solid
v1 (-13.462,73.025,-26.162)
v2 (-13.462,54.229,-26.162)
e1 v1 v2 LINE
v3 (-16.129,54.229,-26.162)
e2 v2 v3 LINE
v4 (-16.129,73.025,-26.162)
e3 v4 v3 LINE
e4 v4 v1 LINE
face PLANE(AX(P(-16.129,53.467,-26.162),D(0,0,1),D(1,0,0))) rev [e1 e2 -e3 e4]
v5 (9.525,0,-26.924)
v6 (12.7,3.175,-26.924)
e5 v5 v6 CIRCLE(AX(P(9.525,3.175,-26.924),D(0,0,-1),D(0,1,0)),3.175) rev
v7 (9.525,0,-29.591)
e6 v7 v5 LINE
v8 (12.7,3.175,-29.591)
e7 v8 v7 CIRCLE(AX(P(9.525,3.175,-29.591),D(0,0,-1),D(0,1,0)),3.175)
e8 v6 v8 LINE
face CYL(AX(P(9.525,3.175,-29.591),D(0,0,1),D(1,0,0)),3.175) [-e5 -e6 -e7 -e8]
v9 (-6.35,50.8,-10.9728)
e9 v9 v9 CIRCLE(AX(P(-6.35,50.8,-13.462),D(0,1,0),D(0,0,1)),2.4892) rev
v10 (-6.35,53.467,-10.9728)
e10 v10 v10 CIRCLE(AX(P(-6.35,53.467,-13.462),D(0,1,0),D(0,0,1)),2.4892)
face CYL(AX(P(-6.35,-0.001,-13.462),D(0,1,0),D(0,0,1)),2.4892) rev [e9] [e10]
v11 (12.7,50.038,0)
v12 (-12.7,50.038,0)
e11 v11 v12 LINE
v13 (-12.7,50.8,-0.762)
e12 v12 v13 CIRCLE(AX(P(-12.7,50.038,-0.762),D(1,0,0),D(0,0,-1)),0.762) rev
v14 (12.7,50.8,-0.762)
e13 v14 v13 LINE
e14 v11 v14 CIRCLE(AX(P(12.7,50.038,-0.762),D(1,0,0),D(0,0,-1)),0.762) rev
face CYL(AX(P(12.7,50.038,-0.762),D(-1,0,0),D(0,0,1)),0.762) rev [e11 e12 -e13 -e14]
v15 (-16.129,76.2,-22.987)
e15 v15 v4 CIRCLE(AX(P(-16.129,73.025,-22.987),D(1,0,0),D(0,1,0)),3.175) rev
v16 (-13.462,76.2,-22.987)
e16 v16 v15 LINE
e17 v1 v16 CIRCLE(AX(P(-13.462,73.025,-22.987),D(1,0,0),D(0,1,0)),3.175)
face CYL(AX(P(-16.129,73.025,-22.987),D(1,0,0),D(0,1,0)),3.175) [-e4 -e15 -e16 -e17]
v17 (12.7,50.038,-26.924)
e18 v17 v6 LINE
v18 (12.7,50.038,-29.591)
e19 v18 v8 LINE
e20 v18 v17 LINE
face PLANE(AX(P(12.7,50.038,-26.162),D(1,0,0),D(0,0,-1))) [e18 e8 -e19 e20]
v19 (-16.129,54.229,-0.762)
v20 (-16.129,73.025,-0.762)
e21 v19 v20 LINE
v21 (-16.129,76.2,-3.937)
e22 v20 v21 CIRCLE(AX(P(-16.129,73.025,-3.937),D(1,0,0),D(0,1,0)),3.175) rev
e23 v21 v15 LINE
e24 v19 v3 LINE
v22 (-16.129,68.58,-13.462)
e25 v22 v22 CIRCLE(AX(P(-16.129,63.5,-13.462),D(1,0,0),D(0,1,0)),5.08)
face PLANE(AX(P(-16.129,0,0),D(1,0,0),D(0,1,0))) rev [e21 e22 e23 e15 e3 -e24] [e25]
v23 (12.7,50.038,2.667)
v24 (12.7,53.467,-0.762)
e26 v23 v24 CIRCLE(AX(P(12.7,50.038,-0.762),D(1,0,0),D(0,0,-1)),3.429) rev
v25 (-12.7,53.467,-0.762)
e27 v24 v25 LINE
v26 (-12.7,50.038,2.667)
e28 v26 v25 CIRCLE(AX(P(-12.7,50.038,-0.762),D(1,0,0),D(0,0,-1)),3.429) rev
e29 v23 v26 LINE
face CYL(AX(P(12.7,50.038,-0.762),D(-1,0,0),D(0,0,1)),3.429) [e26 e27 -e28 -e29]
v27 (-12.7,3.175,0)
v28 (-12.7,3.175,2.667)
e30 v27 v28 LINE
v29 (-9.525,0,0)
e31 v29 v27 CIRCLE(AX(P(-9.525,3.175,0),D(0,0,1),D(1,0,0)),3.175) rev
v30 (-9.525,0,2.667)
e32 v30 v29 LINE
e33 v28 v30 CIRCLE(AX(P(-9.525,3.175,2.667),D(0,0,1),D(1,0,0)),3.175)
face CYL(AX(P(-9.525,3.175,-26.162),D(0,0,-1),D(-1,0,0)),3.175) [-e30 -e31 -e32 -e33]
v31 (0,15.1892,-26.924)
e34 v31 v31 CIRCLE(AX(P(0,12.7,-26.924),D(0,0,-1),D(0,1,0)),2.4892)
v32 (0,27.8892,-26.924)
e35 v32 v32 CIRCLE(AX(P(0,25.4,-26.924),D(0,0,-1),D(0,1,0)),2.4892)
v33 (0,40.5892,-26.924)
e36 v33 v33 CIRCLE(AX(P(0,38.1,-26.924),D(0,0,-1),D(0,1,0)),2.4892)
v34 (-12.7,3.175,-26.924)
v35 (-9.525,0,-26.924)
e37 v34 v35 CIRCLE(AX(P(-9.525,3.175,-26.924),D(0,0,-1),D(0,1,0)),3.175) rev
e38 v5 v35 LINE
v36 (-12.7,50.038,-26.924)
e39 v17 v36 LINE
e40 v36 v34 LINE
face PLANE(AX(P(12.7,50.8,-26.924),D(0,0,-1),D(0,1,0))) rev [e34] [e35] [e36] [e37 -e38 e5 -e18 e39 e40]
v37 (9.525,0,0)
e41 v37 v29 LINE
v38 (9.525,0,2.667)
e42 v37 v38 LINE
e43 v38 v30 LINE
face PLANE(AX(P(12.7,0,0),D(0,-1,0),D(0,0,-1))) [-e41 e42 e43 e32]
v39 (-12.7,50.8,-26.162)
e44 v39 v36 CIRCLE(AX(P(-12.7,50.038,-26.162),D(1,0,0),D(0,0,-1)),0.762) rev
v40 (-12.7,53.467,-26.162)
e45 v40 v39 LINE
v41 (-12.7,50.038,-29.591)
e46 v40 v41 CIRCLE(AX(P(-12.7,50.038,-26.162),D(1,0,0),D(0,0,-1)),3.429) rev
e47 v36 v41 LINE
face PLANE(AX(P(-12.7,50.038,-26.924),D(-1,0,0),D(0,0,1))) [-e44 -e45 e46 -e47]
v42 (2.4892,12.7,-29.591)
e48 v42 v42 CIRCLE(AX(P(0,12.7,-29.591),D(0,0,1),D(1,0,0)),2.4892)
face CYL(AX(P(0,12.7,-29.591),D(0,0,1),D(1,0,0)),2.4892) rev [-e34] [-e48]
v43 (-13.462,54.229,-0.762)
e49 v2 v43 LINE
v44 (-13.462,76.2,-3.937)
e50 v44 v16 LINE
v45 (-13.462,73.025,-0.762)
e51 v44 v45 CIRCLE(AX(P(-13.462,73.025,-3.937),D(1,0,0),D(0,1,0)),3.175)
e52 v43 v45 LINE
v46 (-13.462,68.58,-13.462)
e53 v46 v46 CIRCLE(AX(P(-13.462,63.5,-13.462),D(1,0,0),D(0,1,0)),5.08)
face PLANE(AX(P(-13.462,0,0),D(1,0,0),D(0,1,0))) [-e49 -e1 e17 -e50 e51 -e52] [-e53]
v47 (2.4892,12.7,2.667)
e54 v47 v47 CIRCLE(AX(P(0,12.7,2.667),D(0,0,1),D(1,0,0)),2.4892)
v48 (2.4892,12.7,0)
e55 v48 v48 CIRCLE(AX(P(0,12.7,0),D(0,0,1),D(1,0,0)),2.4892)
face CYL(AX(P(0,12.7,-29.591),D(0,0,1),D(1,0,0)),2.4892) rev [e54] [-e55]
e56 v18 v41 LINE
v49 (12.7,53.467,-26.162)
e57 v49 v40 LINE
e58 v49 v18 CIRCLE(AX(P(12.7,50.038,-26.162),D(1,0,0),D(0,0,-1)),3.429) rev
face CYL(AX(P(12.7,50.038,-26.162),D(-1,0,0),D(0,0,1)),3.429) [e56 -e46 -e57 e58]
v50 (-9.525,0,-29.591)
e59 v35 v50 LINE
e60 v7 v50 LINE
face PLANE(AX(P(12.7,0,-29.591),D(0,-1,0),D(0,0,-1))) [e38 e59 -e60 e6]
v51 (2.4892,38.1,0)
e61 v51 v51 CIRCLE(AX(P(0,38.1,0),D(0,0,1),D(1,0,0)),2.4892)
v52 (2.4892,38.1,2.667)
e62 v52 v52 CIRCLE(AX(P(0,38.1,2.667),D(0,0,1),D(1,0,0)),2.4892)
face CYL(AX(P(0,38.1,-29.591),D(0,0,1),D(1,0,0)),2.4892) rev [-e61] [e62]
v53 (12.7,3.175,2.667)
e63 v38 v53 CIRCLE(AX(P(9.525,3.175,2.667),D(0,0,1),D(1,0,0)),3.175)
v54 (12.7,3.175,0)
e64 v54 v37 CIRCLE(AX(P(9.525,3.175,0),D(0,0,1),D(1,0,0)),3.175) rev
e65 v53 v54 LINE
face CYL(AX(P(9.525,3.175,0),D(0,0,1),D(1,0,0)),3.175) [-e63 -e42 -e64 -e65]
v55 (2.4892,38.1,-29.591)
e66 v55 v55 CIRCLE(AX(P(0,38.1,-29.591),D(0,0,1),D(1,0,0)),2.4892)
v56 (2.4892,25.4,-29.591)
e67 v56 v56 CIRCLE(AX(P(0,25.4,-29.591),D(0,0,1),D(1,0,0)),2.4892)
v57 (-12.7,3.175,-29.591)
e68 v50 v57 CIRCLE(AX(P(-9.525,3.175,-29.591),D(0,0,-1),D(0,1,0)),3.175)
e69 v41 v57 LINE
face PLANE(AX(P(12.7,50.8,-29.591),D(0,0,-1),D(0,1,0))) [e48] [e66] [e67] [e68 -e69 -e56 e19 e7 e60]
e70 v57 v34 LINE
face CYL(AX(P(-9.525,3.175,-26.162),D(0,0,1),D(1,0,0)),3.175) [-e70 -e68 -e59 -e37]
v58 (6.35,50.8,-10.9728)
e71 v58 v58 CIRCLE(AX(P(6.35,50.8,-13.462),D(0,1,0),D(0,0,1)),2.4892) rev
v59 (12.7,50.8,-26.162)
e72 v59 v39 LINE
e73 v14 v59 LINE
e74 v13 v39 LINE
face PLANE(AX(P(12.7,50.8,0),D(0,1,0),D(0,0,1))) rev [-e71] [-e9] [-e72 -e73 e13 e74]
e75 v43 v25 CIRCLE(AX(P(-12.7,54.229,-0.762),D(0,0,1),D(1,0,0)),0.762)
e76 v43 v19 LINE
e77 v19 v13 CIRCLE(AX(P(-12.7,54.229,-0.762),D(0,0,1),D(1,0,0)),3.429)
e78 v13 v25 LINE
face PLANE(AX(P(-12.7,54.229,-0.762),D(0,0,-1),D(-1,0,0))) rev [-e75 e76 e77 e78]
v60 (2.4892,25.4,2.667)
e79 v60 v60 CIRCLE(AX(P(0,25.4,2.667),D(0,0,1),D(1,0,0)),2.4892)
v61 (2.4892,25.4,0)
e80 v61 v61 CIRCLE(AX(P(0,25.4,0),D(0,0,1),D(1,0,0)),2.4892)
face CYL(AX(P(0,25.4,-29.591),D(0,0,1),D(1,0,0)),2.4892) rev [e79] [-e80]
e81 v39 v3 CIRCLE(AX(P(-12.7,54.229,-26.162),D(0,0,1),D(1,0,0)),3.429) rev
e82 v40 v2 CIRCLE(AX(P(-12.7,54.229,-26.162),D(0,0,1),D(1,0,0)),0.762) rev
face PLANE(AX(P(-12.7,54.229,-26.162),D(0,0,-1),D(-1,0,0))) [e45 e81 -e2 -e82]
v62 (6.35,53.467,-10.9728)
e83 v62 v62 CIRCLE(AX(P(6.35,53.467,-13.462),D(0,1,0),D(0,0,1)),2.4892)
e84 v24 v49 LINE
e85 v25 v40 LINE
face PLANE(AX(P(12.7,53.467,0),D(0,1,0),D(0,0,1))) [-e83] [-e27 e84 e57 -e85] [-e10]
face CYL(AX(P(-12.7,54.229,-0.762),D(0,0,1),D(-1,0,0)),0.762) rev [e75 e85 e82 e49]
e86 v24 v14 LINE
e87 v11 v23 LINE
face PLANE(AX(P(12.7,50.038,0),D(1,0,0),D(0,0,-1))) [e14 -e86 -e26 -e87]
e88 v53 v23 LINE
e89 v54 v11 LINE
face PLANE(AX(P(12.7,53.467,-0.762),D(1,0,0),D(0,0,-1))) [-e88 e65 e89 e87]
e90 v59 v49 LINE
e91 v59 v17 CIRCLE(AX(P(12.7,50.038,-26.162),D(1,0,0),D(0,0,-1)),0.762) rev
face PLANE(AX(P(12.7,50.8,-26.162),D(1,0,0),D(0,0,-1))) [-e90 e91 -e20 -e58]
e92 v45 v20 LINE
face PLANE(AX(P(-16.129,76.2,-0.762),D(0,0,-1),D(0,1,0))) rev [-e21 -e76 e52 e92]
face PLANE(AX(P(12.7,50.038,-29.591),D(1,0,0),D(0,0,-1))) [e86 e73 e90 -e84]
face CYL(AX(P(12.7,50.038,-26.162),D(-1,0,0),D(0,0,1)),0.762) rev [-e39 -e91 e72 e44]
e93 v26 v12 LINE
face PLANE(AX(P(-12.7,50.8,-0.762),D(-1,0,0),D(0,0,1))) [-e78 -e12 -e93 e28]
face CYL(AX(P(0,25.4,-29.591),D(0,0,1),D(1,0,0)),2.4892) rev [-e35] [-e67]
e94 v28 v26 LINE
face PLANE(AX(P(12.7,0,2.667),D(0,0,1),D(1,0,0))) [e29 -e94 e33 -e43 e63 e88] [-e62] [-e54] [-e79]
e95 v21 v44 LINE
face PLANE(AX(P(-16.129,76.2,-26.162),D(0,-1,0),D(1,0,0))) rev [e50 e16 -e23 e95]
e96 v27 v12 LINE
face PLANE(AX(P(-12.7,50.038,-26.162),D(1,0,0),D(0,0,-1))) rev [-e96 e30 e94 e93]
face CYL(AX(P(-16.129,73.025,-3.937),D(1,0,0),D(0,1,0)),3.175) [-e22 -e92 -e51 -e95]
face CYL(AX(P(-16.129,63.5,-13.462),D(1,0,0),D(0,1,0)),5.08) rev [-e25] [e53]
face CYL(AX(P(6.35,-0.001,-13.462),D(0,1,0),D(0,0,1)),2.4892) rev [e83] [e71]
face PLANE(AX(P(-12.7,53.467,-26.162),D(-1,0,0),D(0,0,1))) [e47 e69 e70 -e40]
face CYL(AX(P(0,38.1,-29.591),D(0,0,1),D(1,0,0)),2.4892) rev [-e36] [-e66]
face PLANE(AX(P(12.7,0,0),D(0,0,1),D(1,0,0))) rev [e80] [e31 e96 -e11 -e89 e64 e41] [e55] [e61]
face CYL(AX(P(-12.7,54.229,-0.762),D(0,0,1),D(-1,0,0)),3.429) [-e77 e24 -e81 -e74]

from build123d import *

# Parameters (mm, degrees)
BASE_FLANGE1_START = -12.7
BASE_FLANGE1_DEPTH = 25.4
EDGE_FLANGE1_DEPTH = 25.4
SKETCH9_R          = 5.08
CUT_EXTRUDE1_DEPTH = 86.828419099
SKETCH10_R         = 2.4892
CUT_EXTRUDE2_DEPTH = 85.303992818
CUT_EXTRUDE3_REACH = 65.202
SKETCH11_R         = 2.4892
FILLET1_R          = 3.175


# Read off the part's stored shape, not the designer's step: Base-Flange1
# Sheet-metal steps are written as plain solids
with BuildPart() as part:
    # Base-Flange1 outline → Base-Flange1 (new body)
    with BuildSketch(Plane(origin=(0, 0, 0), x_dir=(0, 0, -1), z_dir=(1, 0, 0)).offset(BASE_FLANGE1_START)):
        with BuildLine():
            Line((26.924, 50.038), (26.924, 0))
            Line((26.924, 0), (29.591, 0))
            Line((29.591, 0), (29.591, 50.038))
            ThreePointArc((29.591, 50.038), (28.586669153, 52.462669153), (26.162, 53.467))
            Line((26.162, 53.467), (0.762, 53.467))
            ThreePointArc((0.762, 53.467), (-1.662669153, 52.462669153), (-2.667, 50.038))
            Line((-2.667, 50.038), (-2.667, 0))
            Line((-2.667, 0), (0, 0))
            Line((0, 0), (0, 50.038))
            ThreePointArc((0, 50.038), (0.223184633, 50.576815367), (0.762, 50.8))
            Line((0.762, 50.8), (26.162, 50.8))
            ThreePointArc((26.162, 50.8), (26.700815367, 50.576815367), (26.924, 50.038))
        make_face()
    extrude(amount=BASE_FLANGE1_DEPTH)

    # Edge-Flange1 section (across the edge) → Edge-Flange1 (add)
    with BuildSketch(Plane(origin=(-13.462, 53.467, -26.162), x_dir=(1, 0, 0), z_dir=(0, 0, 1))):
        with BuildLine():
            Line((-2.667, 0.762), (-2.667, 22.733))
            Line((-2.667, 22.733), (0, 22.733))
            Line((0, 22.733), (0, 0.762))
            ThreePointArc((0, 0.762), (0.223184633, 0.223184633), (0.762, 0))
            Line((0.762, 0), (0.762, -2.667))
            ThreePointArc((0.762, -2.667), (-1.662669153, -1.662669153), (-2.667, 0.762))
        make_face()
    extrude(amount=EDGE_FLANGE1_DEPTH)

    # Sketch9 → Cut-Extrude1 (cut, through all)
    with BuildSketch(Plane(origin=(-13.462, 0, 0), x_dir=(0, 0, -1), z_dir=(1, 0, 0))):
        with Locations(Location((13.462, 63.5, 0), (0, 0, 90))):
            Circle(SKETCH9_R)
    extrude(amount=-CUT_EXTRUDE1_DEPTH, mode=Mode.SUBTRACT)

    # Sketch10 → Cut-Extrude2 (cut, through all)
    with BuildSketch(Plane.XY.offset(2.667)):
        with Locations((0, 12.7)):
            Circle(SKETCH10_R)
        with Locations((0, 25.4)):
            Circle(SKETCH10_R)
        with Locations((0, 38.1)):
            Circle(SKETCH10_R)
    extrude(amount=-CUT_EXTRUDE2_DEPTH, mode=Mode.SUBTRACT)

    # Sketch11 → Cut-Extrude3 (cut, up to next)
    with BuildSketch(Plane(origin=(0, 53.467, 0), x_dir=(1, 0, 0), z_dir=(0, 1, 0)), mode=Mode.PRIVATE) as cut_extrude3_sk1:
        with Locations(Location((-6.35, 13.462, 0), (0, 0, 270))):
            Circle(SKETCH11_R)
    cut_extrude3_tool1 = extrude(cut_extrude3_sk1.sketch, amount=-CUT_EXTRUDE3_REACH, mode=Mode.PRIVATE) & part.part
    # Sketch11 → Cut-Extrude3 (cut, up to next)
    with BuildSketch(Plane(origin=(0, 53.467, 0), x_dir=(1, 0, 0), z_dir=(0, 1, 0)), mode=Mode.PRIVATE) as cut_extrude3_sk2:
        with Locations(Location((6.35, 13.462, 0), (0, 0, 270))):
            Circle(SKETCH11_R)
    cut_extrude3_tool2 = extrude(cut_extrude3_sk2.sketch, amount=-CUT_EXTRUDE3_REACH, mode=Mode.PRIVATE) & part.part
    add(cut_extrude3_tool1.solids().sort_by_distance((-6.35, 53.467, -13.462))[0], mode=Mode.SUBTRACT)
    add(cut_extrude3_tool2.solids().sort_by_distance((6.35, 53.467, -13.462))[0], mode=Mode.SUBTRACT)

    # Fillet1
    fillet1_edges = [part.edges().sort_by_distance(p)[0] for p in [
        (-12.7, 0, 1.3335),
        (-12.7, 0, -28.2575),
        (12.7, 0, 1.3335),
        (-14.7955, 76.2, -26.162),
        (-14.7955, 76.2, -0.762),
        (12.7, 0, -28.2575),
    ]]
    fillet(fillet1_edges, radius=FILLET1_R)


solid = part.part
